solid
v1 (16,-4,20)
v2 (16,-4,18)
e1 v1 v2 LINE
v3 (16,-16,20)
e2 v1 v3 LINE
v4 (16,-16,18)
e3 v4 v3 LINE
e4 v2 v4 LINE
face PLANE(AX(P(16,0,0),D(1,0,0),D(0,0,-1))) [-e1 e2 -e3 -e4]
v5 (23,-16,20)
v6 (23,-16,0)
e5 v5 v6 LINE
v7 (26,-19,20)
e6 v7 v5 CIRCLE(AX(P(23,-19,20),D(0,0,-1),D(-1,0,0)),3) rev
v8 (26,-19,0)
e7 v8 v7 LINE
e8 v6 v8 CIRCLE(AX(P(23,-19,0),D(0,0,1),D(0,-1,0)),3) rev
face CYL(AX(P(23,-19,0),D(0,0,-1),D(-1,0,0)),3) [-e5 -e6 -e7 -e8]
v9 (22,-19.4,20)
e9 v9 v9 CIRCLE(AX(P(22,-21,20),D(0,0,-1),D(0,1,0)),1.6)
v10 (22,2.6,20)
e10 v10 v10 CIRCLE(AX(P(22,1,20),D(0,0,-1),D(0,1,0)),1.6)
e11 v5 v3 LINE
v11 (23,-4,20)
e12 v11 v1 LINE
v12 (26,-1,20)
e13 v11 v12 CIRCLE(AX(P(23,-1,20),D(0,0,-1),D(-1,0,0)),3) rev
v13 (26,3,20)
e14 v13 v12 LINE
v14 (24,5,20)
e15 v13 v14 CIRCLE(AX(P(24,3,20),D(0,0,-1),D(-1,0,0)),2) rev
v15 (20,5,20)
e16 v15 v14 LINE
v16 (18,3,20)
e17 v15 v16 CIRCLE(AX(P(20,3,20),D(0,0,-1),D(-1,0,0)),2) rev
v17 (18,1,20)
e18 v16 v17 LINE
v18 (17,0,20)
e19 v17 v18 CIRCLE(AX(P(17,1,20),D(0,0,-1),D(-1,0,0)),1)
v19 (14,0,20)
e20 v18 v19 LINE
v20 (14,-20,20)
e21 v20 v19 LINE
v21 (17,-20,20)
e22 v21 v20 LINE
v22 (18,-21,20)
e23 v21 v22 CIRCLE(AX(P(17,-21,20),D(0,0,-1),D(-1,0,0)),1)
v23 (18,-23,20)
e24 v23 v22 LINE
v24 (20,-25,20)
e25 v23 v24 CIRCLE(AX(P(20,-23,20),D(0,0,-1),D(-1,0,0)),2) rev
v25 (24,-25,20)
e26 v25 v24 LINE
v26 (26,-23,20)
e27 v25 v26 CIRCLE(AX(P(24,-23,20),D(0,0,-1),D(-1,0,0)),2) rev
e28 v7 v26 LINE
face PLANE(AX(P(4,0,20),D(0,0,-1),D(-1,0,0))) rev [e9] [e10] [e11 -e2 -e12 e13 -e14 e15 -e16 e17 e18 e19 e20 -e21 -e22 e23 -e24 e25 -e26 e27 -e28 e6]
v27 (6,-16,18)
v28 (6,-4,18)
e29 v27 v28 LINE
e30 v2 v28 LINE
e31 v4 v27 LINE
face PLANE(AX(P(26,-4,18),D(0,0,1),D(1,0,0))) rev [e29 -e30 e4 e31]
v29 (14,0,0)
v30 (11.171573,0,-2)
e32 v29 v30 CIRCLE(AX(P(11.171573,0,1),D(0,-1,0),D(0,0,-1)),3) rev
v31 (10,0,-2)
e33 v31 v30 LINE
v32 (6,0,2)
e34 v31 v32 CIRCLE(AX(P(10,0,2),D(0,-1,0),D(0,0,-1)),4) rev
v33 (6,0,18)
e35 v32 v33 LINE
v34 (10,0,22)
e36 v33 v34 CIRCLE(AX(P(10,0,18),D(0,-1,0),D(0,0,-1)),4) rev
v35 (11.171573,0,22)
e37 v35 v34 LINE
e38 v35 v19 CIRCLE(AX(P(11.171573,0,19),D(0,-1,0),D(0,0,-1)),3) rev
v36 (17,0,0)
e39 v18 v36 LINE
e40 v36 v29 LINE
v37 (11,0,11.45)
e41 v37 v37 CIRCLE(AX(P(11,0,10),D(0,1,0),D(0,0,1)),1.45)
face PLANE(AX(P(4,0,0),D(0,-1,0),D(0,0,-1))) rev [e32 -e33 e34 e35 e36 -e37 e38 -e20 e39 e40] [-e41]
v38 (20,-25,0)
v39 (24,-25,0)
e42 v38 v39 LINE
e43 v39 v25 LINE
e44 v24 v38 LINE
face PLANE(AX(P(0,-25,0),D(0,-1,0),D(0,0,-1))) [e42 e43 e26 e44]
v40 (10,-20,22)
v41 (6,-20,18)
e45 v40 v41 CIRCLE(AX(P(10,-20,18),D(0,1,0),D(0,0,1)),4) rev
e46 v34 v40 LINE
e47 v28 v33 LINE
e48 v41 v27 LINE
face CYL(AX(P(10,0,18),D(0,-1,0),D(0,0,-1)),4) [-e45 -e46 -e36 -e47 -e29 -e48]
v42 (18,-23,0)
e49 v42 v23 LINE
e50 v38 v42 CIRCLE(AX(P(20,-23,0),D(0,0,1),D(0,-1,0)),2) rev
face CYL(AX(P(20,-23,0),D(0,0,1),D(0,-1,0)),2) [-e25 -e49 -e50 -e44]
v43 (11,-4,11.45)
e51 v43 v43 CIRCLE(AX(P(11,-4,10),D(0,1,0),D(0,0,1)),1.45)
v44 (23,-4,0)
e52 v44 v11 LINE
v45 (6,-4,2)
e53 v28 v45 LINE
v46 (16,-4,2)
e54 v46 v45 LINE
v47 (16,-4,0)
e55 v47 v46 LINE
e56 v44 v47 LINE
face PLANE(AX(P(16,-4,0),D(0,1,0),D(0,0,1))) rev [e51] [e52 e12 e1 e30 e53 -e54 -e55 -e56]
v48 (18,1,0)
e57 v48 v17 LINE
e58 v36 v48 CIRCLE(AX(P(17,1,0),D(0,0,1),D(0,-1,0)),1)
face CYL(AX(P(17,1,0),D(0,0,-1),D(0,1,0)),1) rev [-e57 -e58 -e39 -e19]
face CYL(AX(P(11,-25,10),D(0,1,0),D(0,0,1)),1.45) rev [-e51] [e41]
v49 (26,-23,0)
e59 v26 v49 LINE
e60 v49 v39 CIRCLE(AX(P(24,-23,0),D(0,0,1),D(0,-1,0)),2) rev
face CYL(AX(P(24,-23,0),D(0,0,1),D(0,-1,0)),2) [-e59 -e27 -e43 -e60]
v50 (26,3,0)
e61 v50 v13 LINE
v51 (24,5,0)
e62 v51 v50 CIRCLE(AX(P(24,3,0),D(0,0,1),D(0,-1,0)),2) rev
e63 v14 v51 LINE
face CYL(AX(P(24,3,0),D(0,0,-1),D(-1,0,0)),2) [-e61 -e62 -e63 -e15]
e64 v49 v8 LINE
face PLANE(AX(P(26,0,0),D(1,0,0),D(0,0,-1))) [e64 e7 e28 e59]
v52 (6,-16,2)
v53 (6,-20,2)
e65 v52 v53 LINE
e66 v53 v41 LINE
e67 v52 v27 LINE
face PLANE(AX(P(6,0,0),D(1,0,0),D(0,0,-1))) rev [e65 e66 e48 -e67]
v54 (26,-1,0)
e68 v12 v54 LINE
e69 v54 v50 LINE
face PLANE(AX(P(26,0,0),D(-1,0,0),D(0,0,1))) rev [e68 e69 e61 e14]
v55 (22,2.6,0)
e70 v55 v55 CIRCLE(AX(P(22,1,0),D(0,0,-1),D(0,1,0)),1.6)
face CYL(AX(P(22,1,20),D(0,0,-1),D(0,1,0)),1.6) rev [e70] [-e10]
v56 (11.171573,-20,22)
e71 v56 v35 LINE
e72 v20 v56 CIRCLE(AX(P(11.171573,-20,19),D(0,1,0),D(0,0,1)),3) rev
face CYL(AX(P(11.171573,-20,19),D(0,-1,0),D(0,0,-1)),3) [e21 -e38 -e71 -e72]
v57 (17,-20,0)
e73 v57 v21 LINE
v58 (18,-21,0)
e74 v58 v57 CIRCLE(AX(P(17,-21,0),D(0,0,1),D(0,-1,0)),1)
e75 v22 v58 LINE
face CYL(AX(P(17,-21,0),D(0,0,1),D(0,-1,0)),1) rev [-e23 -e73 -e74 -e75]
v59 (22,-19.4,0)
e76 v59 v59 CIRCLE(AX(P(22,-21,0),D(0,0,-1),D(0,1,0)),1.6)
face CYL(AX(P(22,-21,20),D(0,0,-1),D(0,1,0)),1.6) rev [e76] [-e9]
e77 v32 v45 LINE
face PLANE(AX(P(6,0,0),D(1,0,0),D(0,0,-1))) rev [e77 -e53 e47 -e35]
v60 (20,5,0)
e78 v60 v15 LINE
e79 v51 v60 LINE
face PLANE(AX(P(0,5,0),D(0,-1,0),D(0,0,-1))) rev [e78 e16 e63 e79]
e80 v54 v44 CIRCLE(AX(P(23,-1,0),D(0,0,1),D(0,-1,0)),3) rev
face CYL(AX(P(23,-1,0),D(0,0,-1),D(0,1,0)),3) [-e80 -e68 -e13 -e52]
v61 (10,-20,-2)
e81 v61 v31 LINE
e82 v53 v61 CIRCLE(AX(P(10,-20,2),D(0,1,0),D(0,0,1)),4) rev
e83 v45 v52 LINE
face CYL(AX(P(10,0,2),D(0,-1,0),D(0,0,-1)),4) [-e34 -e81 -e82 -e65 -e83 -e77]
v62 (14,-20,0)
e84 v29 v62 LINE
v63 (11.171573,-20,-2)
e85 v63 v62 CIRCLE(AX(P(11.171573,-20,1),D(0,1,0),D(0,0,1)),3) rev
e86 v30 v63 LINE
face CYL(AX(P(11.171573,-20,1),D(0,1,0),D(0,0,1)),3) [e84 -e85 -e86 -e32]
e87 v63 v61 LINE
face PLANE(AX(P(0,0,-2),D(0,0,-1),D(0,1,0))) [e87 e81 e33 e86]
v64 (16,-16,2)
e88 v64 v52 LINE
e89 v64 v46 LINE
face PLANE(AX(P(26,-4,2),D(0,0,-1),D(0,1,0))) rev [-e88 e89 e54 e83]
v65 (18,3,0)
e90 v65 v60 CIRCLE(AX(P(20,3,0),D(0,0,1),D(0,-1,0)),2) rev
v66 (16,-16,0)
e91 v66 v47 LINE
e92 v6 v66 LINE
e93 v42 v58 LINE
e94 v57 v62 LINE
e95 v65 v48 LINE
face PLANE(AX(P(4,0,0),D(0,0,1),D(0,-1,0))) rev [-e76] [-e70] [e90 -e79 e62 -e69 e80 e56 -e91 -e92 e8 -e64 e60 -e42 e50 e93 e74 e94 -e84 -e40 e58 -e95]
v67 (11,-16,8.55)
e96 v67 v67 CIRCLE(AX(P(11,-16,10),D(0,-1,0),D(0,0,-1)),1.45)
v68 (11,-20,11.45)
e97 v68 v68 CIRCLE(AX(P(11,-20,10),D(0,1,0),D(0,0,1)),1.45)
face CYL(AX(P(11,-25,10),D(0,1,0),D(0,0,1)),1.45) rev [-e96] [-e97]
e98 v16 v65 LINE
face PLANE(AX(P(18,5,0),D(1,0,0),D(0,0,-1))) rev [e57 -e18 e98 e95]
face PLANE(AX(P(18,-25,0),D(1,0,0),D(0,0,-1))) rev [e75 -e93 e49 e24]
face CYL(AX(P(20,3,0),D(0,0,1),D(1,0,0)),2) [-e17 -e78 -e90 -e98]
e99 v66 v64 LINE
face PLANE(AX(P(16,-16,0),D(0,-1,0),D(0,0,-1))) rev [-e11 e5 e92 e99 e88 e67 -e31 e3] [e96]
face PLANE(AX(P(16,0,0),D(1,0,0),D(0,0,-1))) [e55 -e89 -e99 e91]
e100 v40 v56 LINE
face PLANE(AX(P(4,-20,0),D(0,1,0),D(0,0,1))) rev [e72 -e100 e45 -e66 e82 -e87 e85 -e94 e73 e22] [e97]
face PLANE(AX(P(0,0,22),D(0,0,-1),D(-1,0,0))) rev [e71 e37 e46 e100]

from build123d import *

# Parameters (mm, degrees)
SKETCH1_W           = 20
SKETCH1_H           = 20
BOSS_EXTRUDE1_DEPTH = 4
SKETCH2_R           = 3.7
CUT_EXTRUDE1_DEPTH  = 2.6
SKETCH3_R           = 2.1
CUT_EXTRUDE2_DEPTH  = 29.403520909
SKETCH4_W           = 12
SKETCH4_H           = 4
BOSS_EXTRUDE2_DEPTH = 12
SKETCH7_W           = 20
SKETCH7_H           = 4
BOSS_EXTRUDE3_DEPTH = 10
SKETCH8_W           = 8
SKETCH8_H           = 20
BOSS_EXTRUDE4_DEPTH = 5
SKETCH9_W           = 8
SKETCH9_H           = 20
BOSS_EXTRUDE5_DEPTH = 5
SKETCH10_R          = 1.6
CUT_EXTRUDE5_DEPTH  = 42.243181255
SKETCH11_W          = 30
SKETCH11_H          = 30
CUT_EXTRUDE6_DEPTH  = 6
SKETCH12_R          = 1.45
CUT_EXTRUDE7_DEPTH  = 42.243181255
SKETCH13_W          = 8
SKETCH13_H          = 20
BOSS_EXTRUDE6_DEPTH = 2
SKETCH14_W          = 8
SKETCH14_H          = 20
BOSS_EXTRUDE7_DEPTH = 2
SKETCH15_W          = 16
SKETCH15_H          = 12
CUT_EXTRUDE8_DEPTH  = 39.845849199
FILLET2_R           = 3
FILLET4_R           = 2
FILLET5_START       = -21
FILLET5_DEPTH       = 22
FILLET6_R           = 3
FILLET7_R           = 1
FILLET8_R           = 1


with BuildPart() as part:
    # Sketch1 → Boss-Extrude1 (new body)
    with BuildSketch(Plane(origin=(0, 0, 0), x_dir=(0, 0, -1), z_dir=(1, 0, 0))):
        with Locations((-10, -10)):
            Rectangle(SKETCH1_W, SKETCH1_H)
    extrude(amount=BOSS_EXTRUDE1_DEPTH)

    # Sketch2 → Cut-Extrude1 (cut)
    with BuildSketch(Plane(origin=(4, 0, 0), x_dir=(0, 0, -1), z_dir=(1, 0, 0))):
        with Locations((-10, -10)):
            Circle(SKETCH2_R)
    extrude(amount=-CUT_EXTRUDE1_DEPTH, mode=Mode.SUBTRACT)

    # Sketch3 → Cut-Extrude2 (cut, through all)
    with BuildSketch(Plane(origin=(1.4, 0, 0), x_dir=(0, 0, -1), z_dir=(1, 0, 0))):
        with Locations((-10, -10)):
            Circle(SKETCH3_R)
    extrude(amount=-CUT_EXTRUDE2_DEPTH, mode=Mode.SUBTRACT)

    # Sketch4 → Boss-Extrude2 (add)
    with BuildSketch(Plane(origin=(4, 0, 0), x_dir=(0, 0, -1), z_dir=(1, 0, 0))):
        Polygon((-20, 0), (-20, -20), (-16, -20), (-16, -16), (-16, -4), (-16, 0), align=None)
        with Locations((-10, -18)):
            Rectangle(SKETCH4_W, SKETCH4_H)
        Polygon((-4, -16), (-4, -20), (0, -20), (0, -4), (-4, -4), align=None)
        Polygon((0, 0), (-16, 0), (-16, -4), (-4, -4), (0, -4), align=None)
    extrude(amount=BOSS_EXTRUDE2_DEPTH)

    # Sketch7 → Boss-Extrude3 (add)
    with BuildSketch(Plane(origin=(16, 0, 0), x_dir=(0, 0, -1), z_dir=(1, 0, 0))):
        with Locations((-10, -18)):
            Rectangle(SKETCH7_W, SKETCH7_H)
        with Locations((-10, -2)):
            Rectangle(SKETCH7_W, SKETCH7_H)
    extrude(amount=BOSS_EXTRUDE3_DEPTH)

    # Sketch8 → Boss-Extrude4 (add)
    with BuildSketch(Plane(origin=(0, -20, 0), x_dir=(-1, 0, 0), z_dir=(0, -1, 0))):
        with Locations((-22, -10)):
            Rectangle(SKETCH8_W, SKETCH8_H)
    extrude(amount=BOSS_EXTRUDE4_DEPTH)

    # Sketch9 → Boss-Extrude5 (add)
    with BuildSketch(Plane(origin=(0, 0, 0), x_dir=(1, 0, 0), z_dir=(0, 1, 0))):
        with Locations((22, -10)):
            Rectangle(SKETCH9_W, SKETCH9_H)
    extrude(amount=BOSS_EXTRUDE5_DEPTH)

    # Sketch10 → Cut-Extrude5 (cut, through all)
    with BuildSketch(Plane(origin=(0, 0, 0), x_dir=(-1, 0, 0), z_dir=(0, 0, -1))):
        with Locations(Location((-22, 1, 0), (0, 0, 90))):
            Circle(SKETCH10_R)
        with Locations(Location((-22, -21, 0), (0, 0, 90))):
            Circle(SKETCH10_R)
    extrude(amount=-CUT_EXTRUDE5_DEPTH, mode=Mode.SUBTRACT)

    # Sketch11 → Cut-Extrude6 (cut)
    with BuildSketch(Plane.ZY):
        with Locations((15, -5)):
            Rectangle(SKETCH11_W, SKETCH11_H)
    extrude(amount=-CUT_EXTRUDE6_DEPTH, mode=Mode.SUBTRACT)

    # Sketch12 → Cut-Extrude7 (cut, through all)
    with BuildSketch(Plane(origin=(0, 0, 0), x_dir=(1, 0, 0), z_dir=(0, 1, 0))):
        with Locations(Location((11, -10, 0), (0, 0, 270))):
            Circle(SKETCH12_R)
    extrude(amount=-CUT_EXTRUDE7_DEPTH, mode=Mode.SUBTRACT)

    # Sketch13 → Boss-Extrude6 (add)
    with BuildSketch(Plane.XY.offset(20)):
        with Locations((10, -10)):
            Rectangle(SKETCH13_W, SKETCH13_H)
    extrude(amount=BOSS_EXTRUDE6_DEPTH)

    # Sketch14 → Boss-Extrude7 (add)
    with BuildSketch(Plane(origin=(0, 0, 0), x_dir=(-1, 0, 0), z_dir=(0, 0, -1))):
        with Locations((-10, -10)):
            Rectangle(SKETCH14_W, SKETCH14_H)
    extrude(amount=BOSS_EXTRUDE7_DEPTH)

    # Sketch15 → Cut-Extrude8 (cut, through all)
    with BuildSketch(Plane.ZY.offset(-6)):
        with Locations((10, -10)):
            Rectangle(SKETCH15_W, SKETCH15_H)
    extrude(amount=-CUT_EXTRUDE8_DEPTH, mode=Mode.SUBTRACT)

    # Fillet2
    fillet2_edges = [part.edges().sort_by_distance(p)[0] for p in [
        (26, -16, 10),
        (26, -4, 10),
    ]]
    fillet(fillet2_edges, radius=FILLET2_R)

    # Fillet4
    fillet4_edges = [part.edges().sort_by_distance(p)[0] for p in [
        (26, -25, 10),
        (18, -25, 10),
        (26, 5, 10),
        (18, 5, 10),
    ]]
    fillet(fillet4_edges, radius=FILLET4_R)

    # Fillet5: read off the stored shape, not the designer's step
    # Fillet5 outline → Fillet5 (cut)
    with BuildSketch(Plane(origin=(0, 0, 0), x_dir=(1, 0, 0), z_dir=(0, 1, 0)).offset(FILLET5_START)):
        with BuildLine():
            Line((6, 2), (6, -2))
            ThreePointArc((6, -2), (7.171572875, 0.828427125), (10, 2))
            Line((10, 2), (6, 2))
        make_face()
        with BuildLine():
            ThreePointArc((10, -22), (7.171572875, -20.828427125), (6, -18))
            Line((6, -18), (6, -22))
            Line((6, -22), (10, -22))
        make_face()
    extrude(amount=FILLET5_DEPTH, mode=Mode.SUBTRACT)

    # Fillet6
    # the kernel refuses this fillet: 3 mm, written as the material it takes off along each edge
    with BuildSketch(Plane(origin=(14, -27.071067812, -2), x_dir=(-1, 0, 0), z_dir=(0, 1, 0))) as fillet6_piece_1:
        with BuildLine():
            CenterArc((2.828427125, 3), FILLET6_R, 199.471220634, 70.528779366)
            Line((0, 2), (-0.056568542, 1.98))
            ThreePointArc((-0.056568542, 1.98), (-0.06, 1), (-0.06, 0))
            Line((-0.06, 0), (0, -0.06))
            Line((0, -0.06), (2.828427125, -0.06))
            Line((2.828427125, -0.06), (2.828427125, 0))
        make_face()
    extrude(amount=34.142135624, mode=Mode.SUBTRACT)
    with BuildSketch(Plane(origin=(14, -27.071067812, 22), x_dir=(0, 0, -1), z_dir=(0, 1, 0))) as fillet6_piece_2:
        with BuildLine():
            CenterArc((3, 2.828427125), FILLET6_R, 180, 70.528779366)
            Line((0, 2.828427125), (-0.06, 2.828427125))
            Line((-0.06, 2.828427125), (-0.06, 0))
            Line((-0.06, 0), (0, -0.06))
            ThreePointArc((0, -0.06), (1, -0.06), (1.98, -0.056568542))
            Line((1.98, -0.056568542), (2, 0))
        make_face()
    extrude(amount=34.142135624, mode=Mode.SUBTRACT)

    # Fillet7
    fillet7_edges = [part.edges().sort_by_distance(p)[0] for p in [
        (18, -20, 10),
    ]]
    fillet(fillet7_edges, radius=FILLET7_R)

    # Fillet8
    fillet8_edges = [part.edges().sort_by_distance(p)[0] for p in [
        (18, 0, 10),
    ]]
    fillet(fillet8_edges, radius=FILLET8_R)


solid = part.part
